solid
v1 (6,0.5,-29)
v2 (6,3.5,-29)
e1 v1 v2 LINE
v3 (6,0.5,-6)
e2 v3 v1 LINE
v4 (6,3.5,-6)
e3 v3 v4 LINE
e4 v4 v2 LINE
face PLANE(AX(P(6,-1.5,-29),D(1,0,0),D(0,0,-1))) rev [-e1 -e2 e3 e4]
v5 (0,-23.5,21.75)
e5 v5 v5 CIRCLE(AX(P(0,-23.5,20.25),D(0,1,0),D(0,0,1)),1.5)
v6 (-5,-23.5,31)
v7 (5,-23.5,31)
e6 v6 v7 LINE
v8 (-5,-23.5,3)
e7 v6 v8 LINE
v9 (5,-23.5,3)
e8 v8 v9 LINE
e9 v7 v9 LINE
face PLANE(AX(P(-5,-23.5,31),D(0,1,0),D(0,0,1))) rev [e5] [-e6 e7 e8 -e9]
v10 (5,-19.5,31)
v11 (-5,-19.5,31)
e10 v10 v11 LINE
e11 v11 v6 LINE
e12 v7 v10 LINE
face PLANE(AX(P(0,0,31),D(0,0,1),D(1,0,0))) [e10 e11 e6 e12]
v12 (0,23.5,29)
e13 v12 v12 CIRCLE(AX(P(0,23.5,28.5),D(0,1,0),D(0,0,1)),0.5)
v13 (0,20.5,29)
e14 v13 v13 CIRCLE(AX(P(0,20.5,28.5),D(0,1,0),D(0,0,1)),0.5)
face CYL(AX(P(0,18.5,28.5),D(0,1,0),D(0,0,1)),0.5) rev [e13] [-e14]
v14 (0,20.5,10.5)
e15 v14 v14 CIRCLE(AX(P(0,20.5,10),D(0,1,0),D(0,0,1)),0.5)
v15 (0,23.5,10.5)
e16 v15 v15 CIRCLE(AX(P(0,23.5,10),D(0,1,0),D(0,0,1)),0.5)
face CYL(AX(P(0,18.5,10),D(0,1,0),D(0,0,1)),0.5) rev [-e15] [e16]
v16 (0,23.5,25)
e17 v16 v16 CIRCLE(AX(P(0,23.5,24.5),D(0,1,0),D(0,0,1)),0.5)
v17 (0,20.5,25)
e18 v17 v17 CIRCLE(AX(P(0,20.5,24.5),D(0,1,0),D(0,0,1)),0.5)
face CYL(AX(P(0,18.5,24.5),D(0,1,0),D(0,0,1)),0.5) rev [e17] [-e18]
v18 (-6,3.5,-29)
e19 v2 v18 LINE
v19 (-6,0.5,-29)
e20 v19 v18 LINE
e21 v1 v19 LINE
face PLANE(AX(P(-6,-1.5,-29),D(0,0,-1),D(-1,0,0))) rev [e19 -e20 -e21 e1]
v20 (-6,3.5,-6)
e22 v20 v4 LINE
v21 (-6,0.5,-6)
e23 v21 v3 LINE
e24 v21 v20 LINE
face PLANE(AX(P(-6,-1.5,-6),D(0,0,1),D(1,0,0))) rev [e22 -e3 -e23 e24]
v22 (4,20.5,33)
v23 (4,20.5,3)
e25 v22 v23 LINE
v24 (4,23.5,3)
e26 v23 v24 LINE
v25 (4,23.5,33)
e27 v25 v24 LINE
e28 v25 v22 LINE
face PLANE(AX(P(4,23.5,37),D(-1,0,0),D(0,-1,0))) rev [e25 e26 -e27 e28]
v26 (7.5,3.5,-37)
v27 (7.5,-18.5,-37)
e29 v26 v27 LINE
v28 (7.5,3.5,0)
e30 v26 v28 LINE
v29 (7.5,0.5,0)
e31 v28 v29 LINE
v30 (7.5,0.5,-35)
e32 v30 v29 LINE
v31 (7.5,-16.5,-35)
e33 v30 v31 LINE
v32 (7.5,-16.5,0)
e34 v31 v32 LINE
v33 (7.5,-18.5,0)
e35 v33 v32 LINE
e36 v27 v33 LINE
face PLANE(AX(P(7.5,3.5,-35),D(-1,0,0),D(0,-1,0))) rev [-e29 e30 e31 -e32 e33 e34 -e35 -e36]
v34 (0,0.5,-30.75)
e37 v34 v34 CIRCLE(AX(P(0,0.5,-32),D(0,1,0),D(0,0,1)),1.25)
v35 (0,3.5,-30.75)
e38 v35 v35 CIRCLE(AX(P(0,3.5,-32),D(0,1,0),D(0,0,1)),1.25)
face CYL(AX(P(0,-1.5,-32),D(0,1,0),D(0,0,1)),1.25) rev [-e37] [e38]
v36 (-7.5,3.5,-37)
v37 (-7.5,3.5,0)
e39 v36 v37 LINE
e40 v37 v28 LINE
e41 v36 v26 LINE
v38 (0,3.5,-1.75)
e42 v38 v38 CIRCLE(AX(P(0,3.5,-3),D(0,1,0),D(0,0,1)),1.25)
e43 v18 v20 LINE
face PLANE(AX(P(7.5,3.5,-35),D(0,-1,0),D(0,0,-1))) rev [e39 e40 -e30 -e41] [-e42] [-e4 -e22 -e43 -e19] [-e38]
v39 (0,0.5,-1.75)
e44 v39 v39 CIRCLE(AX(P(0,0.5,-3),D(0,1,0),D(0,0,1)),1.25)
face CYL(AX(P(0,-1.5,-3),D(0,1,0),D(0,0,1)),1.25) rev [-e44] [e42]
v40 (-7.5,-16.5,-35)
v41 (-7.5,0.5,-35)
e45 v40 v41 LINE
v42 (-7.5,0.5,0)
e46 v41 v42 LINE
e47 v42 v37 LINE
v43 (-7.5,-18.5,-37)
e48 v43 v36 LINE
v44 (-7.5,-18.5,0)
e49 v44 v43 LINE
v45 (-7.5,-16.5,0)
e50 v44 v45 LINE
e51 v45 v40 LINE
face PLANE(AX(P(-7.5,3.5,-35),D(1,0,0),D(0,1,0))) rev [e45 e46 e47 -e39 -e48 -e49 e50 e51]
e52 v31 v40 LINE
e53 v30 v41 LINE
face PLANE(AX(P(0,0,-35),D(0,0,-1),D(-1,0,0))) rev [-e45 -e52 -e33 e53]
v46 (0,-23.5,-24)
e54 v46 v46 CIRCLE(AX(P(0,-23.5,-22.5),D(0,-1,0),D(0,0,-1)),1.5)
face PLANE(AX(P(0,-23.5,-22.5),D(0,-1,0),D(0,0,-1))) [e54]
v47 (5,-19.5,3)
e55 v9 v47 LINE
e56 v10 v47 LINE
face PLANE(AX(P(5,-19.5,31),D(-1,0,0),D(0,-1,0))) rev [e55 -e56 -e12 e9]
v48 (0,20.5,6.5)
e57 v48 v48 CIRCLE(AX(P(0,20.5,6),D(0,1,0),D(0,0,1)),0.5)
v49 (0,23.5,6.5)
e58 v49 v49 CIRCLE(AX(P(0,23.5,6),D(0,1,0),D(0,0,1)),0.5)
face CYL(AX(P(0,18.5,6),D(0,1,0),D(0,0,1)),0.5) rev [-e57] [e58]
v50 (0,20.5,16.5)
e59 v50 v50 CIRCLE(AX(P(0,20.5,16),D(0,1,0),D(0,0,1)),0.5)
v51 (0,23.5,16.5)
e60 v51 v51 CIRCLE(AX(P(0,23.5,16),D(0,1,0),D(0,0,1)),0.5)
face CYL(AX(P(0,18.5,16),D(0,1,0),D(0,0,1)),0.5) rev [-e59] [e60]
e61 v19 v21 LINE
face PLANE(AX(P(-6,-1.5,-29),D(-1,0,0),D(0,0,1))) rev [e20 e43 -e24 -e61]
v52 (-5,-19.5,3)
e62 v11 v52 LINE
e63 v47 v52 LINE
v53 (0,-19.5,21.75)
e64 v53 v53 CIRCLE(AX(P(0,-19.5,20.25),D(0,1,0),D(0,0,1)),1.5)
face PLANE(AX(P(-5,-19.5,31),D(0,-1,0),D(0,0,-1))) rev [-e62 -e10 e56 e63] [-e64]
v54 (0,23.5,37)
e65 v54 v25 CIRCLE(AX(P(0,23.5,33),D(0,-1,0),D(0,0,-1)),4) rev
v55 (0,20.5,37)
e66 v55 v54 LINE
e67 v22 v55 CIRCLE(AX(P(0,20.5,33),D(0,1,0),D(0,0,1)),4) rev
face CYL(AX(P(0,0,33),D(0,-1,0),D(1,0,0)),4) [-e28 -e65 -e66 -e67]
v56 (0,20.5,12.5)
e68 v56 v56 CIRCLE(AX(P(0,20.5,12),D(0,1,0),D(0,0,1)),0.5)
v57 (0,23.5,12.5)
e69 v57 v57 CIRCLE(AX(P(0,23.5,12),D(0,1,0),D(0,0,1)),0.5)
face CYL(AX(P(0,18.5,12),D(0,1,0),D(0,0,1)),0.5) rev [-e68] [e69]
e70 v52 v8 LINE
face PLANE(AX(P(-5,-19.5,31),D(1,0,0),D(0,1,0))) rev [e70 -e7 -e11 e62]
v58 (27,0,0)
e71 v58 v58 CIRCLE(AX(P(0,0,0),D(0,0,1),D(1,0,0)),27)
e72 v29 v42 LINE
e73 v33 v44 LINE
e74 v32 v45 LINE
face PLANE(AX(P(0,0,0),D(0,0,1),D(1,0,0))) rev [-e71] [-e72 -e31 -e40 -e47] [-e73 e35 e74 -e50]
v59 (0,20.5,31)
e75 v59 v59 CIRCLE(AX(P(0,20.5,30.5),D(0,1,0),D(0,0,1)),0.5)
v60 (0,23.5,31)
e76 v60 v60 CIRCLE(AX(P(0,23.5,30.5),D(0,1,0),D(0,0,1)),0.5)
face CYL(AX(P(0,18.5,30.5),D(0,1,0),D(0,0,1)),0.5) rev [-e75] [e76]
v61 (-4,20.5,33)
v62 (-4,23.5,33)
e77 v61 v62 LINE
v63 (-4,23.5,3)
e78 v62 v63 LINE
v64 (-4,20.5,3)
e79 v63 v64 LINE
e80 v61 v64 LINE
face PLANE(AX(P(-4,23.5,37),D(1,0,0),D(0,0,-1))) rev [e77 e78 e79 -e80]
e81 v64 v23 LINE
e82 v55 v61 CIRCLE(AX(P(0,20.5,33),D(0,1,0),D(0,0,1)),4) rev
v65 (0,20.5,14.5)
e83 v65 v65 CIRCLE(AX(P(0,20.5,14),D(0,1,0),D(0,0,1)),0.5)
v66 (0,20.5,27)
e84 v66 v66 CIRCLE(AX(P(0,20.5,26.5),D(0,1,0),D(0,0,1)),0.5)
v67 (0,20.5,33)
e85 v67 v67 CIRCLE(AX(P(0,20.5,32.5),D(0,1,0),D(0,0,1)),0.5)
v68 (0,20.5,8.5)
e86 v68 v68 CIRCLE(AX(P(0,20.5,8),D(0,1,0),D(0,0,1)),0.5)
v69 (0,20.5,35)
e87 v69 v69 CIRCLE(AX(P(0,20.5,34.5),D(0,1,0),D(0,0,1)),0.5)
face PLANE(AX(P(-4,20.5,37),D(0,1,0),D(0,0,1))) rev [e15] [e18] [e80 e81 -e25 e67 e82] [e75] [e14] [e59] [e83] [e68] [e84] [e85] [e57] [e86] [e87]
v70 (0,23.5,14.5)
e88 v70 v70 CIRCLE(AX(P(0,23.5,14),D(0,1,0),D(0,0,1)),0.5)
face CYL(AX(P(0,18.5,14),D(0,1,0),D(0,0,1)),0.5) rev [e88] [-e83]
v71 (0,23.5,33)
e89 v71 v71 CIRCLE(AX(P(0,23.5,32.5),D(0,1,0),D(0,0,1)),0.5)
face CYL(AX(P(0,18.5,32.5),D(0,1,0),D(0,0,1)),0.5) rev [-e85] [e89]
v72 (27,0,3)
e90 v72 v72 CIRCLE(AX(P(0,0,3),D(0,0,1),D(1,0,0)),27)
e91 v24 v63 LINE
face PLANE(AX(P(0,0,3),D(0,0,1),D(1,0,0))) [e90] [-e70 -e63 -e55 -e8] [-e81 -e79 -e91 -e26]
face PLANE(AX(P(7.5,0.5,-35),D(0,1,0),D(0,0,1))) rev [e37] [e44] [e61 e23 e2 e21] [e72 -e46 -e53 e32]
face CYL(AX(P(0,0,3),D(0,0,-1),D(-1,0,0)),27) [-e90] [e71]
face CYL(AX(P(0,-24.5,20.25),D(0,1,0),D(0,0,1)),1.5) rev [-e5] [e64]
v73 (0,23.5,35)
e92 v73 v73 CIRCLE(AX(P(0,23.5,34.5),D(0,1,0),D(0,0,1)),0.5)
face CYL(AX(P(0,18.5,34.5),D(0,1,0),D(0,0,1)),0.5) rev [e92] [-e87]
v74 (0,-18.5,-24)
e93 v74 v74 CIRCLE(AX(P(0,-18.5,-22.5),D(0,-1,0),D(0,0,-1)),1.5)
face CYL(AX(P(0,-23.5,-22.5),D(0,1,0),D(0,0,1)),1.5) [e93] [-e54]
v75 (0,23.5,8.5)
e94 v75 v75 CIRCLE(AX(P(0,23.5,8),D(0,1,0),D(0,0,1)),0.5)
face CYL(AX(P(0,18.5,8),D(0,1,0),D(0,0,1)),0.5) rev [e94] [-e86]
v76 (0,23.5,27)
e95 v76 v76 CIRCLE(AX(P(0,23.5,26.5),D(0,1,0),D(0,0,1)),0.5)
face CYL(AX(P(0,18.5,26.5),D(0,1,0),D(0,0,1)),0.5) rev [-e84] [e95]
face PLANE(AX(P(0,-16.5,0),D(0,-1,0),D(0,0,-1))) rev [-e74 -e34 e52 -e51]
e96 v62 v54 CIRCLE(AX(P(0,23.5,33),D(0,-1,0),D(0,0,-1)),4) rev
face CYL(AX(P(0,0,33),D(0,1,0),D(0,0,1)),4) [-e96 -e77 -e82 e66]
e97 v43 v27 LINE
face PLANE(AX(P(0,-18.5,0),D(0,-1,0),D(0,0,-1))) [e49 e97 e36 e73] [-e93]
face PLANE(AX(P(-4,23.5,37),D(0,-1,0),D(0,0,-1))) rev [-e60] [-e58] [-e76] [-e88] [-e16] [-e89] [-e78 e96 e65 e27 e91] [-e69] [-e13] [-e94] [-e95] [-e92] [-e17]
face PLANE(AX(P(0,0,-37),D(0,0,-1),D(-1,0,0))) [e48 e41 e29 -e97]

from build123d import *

# Parameters (mm, degrees)
SKETCH1_R           = 27
BOSS_EXTRUDE1_DEPTH = 3
SKETCH2_W           = 8
SKETCH2_H           = 3
BOSS_EXTRUDE2_DEPTH = 34
SKETCH5_R           = 0.5
CUT_EXTRUDE1_DEPTH  = 5
FILLET1_R           = 4
SKETCH6_W           = 15
SKETCH6_H           = 3
BOSS_EXTRUDE3_DEPTH = 35
SKETCH7_R           = 1.25
SKETCH7_W           = 12
SKETCH7_H           = 23
CUT_EXTRUDE2_DEPTH  = 5
SKETCH8_W           = 15
SKETCH8_H           = 20
BOSS_EXTRUDE4_DEPTH = 2
SKETCH9_W           = 15
SKETCH9_H           = 37
BOSS_EXTRUDE5_DEPTH = 2
SKETCH10_W          = 10
SKETCH10_H          = 4
BOSS_EXTRUDE6_DEPTH = 28
SKETCH11_R          = 1.5
CUT_EXTRUDE3_DEPTH  = 5
SKETCH12_R          = 1.5
BOSS_EXTRUDE7_DEPTH = 5


with BuildPart() as part:
    # Sketch1 → Boss-Extrude1 (new body)
    with BuildSketch(Plane.XY):
        Circle(SKETCH1_R)
    extrude(amount=BOSS_EXTRUDE1_DEPTH)

    # Sketch2 → Boss-Extrude2 (add)
    with BuildSketch(Plane.XY.offset(3)):
        with Locations((0, 22)):
            Rectangle(SKETCH2_W, SKETCH2_H)
    extrude(amount=BOSS_EXTRUDE2_DEPTH)

    # Sketch5 → Cut-Extrude1 (cut)
    with BuildSketch(Plane(origin=(0, 23.5, 0), x_dir=(1, 0, 0), z_dir=(0, 1, 0))):
        with Locations(Location((0, -6, 0), (0, 0, 270))):
            Circle(SKETCH5_R)
        with Locations(Location((0, -8, 0), (0, 0, 270))):
            Circle(SKETCH5_R)
        with Locations(Location((0, -10, 0), (0, 0, 270))):
            Circle(SKETCH5_R)
        with Locations(Location((0, -12, 0), (0, 0, 270))):
            Circle(SKETCH5_R)
        with Locations(Location((0, -14, 0), (0, 0, 270))):
            Circle(SKETCH5_R)
        with Locations(Location((0, -16, 0), (0, 0, 270))):
            Circle(SKETCH5_R)
        with Locations(Location((0, -34.5, 0), (0, 0, 270))):
            Circle(SKETCH5_R)
        with Locations(Location((0, -32.5, 0), (0, 0, 270))):
            Circle(SKETCH5_R)
        with Locations(Location((0, -30.5, 0), (0, 0, 270))):
            Circle(SKETCH5_R)
        with Locations(Location((0, -28.5, 0), (0, 0, 270))):
            Circle(SKETCH5_R)
        with Locations(Location((0, -26.5, 0), (0, 0, 270))):
            Circle(SKETCH5_R)
        with Locations(Location((0, -24.5, 0), (0, 0, 270))):
            Circle(SKETCH5_R)
    extrude(amount=-CUT_EXTRUDE1_DEPTH, mode=Mode.SUBTRACT)

    # Fillet1
    fillet1_edges = [part.edges().sort_by_distance(p)[0] for p in [
        (-4, 22, 37),
        (4, 22, 37),
    ]]
    fillet(fillet1_edges, radius=FILLET1_R - 0.0001)  # a hair under: the kernel refuses the full size

    # Sketch6 → Boss-Extrude3 (add)
    with BuildSketch(Plane(origin=(0, 0, 0), x_dir=(-1, 0, 0), z_dir=(0, 0, -1))):
        with Locations((0, 2)):
            Rectangle(SKETCH6_W, SKETCH6_H)
    extrude(amount=BOSS_EXTRUDE3_DEPTH)

    # Sketch7 → Cut-Extrude2 (cut)
    with BuildSketch(Plane(origin=(0, 3.5, 0), x_dir=(1, 0, 0), z_dir=(0, 1, 0))):
        with Locations(Location((0, 32, 0), (0, 0, 270))):
            Circle(SKETCH7_R)
        with Locations(Location((0, 3, 0), (0, 0, 270))):
            Circle(SKETCH7_R)
        with Locations((0, 17.5)):
            Rectangle(SKETCH7_W, SKETCH7_H)
    extrude(amount=-CUT_EXTRUDE2_DEPTH, mode=Mode.SUBTRACT)

    # Sketch8 → Boss-Extrude4 (add)
    with BuildSketch(Plane(origin=(0, 0, -35), x_dir=(-1, 0, 0), z_dir=(0, 0, -1))):
        with Locations((0, -6.5)):
            Rectangle(SKETCH8_W, SKETCH8_H)
    extrude(amount=BOSS_EXTRUDE4_DEPTH)

    # Sketch9 → Boss-Extrude5 (add)
    with BuildSketch(Plane.XZ.offset(16.5)):
        with Locations((0, -18.5)):
            Rectangle(SKETCH9_W, SKETCH9_H)
    extrude(amount=BOSS_EXTRUDE5_DEPTH)

    # Sketch10 → Boss-Extrude6 (add)
    with BuildSketch(Plane.XY.offset(3)):
        with Locations((0, -21.5)):
            Rectangle(SKETCH10_W, SKETCH10_H)
    extrude(amount=BOSS_EXTRUDE6_DEPTH)

    # Sketch11 → Cut-Extrude3 (cut)
    with BuildSketch(Plane(origin=(0, -19.5, 0), x_dir=(1, 0, 0), z_dir=(0, 1, 0))):
        with Locations(Location((0, -20.25, 0), (0, 0, 270))):
            Circle(SKETCH11_R)
    extrude(amount=-CUT_EXTRUDE3_DEPTH, mode=Mode.SUBTRACT)

    # Sketch12 → Boss-Extrude7 (add)
    with BuildSketch(Plane.XZ.offset(18.5)):
        with Locations(Location((0, -22.5, 0), (0, 0, 270))):
            Circle(SKETCH12_R)
    extrude(amount=BOSS_EXTRUDE7_DEPTH)


solid = part.part
